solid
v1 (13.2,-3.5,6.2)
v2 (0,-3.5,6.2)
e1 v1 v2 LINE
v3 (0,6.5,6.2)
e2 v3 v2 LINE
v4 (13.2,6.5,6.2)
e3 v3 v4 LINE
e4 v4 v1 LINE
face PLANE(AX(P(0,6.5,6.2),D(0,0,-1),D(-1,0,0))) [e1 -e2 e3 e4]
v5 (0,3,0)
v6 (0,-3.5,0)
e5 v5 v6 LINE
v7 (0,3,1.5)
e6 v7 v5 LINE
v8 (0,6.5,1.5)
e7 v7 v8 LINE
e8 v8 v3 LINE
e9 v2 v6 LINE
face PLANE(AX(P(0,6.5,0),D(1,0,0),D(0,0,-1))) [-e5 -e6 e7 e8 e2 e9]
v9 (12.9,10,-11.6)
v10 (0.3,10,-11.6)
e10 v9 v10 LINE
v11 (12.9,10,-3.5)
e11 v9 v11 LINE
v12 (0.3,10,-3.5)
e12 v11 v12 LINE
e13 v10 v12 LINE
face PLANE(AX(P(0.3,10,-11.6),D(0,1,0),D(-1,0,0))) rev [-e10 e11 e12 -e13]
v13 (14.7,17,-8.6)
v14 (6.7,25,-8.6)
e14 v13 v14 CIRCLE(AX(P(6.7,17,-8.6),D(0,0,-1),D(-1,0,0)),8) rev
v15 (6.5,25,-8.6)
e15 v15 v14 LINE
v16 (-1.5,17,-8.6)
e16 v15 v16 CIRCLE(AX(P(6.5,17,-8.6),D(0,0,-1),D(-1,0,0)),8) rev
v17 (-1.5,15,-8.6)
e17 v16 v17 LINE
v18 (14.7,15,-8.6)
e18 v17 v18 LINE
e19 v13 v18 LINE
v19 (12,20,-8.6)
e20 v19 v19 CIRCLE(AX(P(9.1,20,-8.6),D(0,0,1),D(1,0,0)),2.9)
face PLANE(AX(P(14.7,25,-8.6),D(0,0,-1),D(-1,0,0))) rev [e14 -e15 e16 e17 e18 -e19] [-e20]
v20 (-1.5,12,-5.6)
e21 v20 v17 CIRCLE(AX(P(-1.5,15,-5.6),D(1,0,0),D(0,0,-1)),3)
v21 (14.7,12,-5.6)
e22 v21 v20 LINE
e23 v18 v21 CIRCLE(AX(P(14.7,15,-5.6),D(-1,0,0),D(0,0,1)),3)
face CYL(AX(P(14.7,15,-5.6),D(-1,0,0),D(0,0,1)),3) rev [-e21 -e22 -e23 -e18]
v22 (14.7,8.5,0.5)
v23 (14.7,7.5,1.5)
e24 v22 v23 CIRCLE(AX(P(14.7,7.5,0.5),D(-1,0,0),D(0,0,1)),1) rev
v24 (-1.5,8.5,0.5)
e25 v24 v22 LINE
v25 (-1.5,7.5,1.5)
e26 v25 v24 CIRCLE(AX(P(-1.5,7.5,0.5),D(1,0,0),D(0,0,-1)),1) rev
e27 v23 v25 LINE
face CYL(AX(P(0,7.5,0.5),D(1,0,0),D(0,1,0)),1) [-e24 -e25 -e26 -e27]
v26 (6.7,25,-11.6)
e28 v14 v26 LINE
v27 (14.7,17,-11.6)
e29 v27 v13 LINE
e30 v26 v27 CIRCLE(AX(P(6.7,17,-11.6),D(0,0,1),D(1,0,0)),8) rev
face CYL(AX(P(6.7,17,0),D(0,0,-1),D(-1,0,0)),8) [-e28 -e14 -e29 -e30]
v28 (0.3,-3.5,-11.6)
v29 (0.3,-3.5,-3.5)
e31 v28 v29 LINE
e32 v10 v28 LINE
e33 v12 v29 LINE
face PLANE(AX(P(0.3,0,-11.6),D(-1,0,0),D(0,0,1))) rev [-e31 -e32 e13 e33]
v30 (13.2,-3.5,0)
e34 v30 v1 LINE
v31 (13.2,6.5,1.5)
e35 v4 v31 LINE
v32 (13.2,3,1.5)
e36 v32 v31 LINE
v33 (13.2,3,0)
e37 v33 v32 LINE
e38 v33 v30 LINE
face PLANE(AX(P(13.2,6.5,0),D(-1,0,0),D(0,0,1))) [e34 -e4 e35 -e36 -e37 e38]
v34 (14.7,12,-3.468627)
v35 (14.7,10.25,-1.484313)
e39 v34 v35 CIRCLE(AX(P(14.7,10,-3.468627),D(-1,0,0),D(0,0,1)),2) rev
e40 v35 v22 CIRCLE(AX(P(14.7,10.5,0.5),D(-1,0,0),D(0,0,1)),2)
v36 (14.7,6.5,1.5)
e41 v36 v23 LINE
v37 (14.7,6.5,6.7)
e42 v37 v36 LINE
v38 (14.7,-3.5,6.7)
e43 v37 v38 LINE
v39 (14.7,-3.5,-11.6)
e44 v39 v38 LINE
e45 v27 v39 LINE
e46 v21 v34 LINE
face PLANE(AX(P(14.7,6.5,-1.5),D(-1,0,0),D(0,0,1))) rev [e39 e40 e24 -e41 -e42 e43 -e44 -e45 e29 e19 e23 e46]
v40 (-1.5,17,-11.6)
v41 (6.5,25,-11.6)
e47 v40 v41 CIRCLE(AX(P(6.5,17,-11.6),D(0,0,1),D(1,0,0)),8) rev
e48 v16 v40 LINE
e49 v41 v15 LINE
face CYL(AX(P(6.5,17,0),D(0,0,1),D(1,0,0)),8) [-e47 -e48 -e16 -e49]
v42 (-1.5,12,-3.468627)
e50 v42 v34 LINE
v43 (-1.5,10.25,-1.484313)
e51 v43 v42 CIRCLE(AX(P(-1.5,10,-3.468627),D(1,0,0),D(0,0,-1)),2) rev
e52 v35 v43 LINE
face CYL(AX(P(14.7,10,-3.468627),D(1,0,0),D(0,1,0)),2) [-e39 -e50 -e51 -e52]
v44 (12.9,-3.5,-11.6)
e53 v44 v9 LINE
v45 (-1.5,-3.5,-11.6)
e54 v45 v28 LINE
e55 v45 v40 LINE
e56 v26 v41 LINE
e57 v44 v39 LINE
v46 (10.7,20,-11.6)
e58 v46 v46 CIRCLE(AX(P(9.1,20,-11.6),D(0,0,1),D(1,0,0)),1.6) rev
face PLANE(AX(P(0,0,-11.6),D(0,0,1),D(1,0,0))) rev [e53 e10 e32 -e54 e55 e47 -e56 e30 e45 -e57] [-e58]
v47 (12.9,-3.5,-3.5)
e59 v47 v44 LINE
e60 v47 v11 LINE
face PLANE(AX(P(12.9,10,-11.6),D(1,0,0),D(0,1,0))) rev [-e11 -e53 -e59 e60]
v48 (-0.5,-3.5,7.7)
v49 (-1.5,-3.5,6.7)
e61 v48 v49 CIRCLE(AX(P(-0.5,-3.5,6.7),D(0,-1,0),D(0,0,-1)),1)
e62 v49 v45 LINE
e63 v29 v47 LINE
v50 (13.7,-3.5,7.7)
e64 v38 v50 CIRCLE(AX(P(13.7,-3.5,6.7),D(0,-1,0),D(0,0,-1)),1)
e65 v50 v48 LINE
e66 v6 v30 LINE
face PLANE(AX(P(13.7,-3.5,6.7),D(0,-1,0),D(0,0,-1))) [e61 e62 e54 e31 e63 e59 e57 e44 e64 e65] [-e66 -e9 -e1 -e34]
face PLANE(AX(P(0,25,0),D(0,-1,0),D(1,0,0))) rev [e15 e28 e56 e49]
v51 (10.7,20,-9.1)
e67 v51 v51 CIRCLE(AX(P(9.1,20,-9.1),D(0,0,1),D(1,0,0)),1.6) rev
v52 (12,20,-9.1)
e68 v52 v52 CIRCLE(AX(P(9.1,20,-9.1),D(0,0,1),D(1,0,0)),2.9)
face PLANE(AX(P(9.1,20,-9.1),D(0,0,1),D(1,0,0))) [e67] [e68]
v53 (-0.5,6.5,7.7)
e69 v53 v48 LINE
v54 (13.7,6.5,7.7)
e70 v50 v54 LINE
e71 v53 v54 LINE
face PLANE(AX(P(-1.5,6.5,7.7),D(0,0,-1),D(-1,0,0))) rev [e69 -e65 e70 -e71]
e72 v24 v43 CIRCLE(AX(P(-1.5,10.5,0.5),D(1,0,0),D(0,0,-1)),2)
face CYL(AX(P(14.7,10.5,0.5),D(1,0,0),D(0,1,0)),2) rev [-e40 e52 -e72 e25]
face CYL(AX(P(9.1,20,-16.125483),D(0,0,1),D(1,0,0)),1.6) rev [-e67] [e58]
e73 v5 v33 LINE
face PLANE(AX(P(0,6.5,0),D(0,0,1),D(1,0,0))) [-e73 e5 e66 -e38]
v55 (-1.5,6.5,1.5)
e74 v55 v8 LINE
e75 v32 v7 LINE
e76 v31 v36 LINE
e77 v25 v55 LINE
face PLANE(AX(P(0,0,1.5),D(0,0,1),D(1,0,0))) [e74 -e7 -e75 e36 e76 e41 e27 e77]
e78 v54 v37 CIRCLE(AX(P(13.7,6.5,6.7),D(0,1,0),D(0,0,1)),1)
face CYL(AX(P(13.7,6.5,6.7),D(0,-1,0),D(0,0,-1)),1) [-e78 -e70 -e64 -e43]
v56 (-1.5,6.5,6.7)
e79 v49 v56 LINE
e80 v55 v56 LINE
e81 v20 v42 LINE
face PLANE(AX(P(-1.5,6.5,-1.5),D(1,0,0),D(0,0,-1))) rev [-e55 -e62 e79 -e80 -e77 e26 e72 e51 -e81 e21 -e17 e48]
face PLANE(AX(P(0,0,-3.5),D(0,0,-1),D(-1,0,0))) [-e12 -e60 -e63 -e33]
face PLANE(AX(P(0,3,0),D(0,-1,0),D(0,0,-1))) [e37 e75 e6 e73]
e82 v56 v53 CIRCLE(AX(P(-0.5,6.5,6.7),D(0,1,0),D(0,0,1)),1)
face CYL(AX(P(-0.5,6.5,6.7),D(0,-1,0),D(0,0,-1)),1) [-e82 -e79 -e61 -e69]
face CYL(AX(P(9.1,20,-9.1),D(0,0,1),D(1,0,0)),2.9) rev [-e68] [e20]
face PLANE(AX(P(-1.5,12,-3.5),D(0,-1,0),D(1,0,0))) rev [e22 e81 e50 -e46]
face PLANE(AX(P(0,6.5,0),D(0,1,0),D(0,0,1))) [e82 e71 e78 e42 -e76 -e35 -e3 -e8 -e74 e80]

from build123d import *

# Parameters (mm, degrees)
CROQUIS2_W              = 16.2
CROQUIS2_H              = 9.2
CROQUIS2_W_2            = 13.2
CROQUIS2_H_2            = 6.2
SALIENTE_EXTRUIR1_DEPTH = 6.5
CROQUIS3_W              = 16.2
CROQUIS3_H              = 12
SALIENTE_EXTRUIR2_DEPTH = 2
SALIENTE_EXTRUIR3_DEPTH = 8.1
CROQUIS5_W              = 16.2
CROQUIS5_H              = 3
SALIENTE_EXTRUIR4_DEPTH = 13
CROQUIS6_R              = 1.6
CORTAR_EXTRUIR1_DEPTH   = 3
CROQUIS7_W              = 16.2
CROQUIS7_H              = 2
SALIENTE_EXTRUIR5_DEPTH = 3
CROQUIS8_R              = 2.9
CORTAR_EXTRUIR2_DEPTH   = 0.5
REDONDEO1_R             = 1
REDONDEO2_R             = 1
REDONDEO3_R             = 2
REDONDEO4_R             = 2
REDONDEO5_R             = 3
REDONDEO6_R             = 8
CROQUIS9_W              = 13.2
CROQUIS9_H              = 6.2
SALIENTE_EXTRUIR6_DEPTH = 3.5
CROQUIS10_W             = 13.2
CROQUIS10_H             = 1.5
SALIENTE_EXTRUIR7_DEPTH = 3.5


with BuildPart() as part:
    # Croquis2 → Saliente-Extruir1 (new body)
    with BuildSketch(Plane(origin=(0, 0, 0), x_dir=(1, 0, 0), z_dir=(0, 1, 0))):
        with Locations((6.6, -3.1)):
            Rectangle(CROQUIS2_W, CROQUIS2_H)
        with Locations((6.6, -3.1)):
            Rectangle(CROQUIS2_W_2, CROQUIS2_H_2, mode=Mode.SUBTRACT)
    extrude(amount=SALIENTE_EXTRUIR1_DEPTH)

    # Croquis3 → Saliente-Extruir2 (add)
    with BuildSketch(Plane(origin=(0, 0, -1.5), x_dir=(-1, 0, 0), z_dir=(0, 0, -1))):
        with Locations((-6.6, 6)):
            Rectangle(CROQUIS3_W, CROQUIS3_H)
    extrude(amount=SALIENTE_EXTRUIR2_DEPTH)

    # Croquis4 → Saliente-Extruir3 (add)
    with BuildSketch(Plane(origin=(0, 0, -3.5), x_dir=(-1, 0, 0), z_dir=(0, 0, -1))):
        Polygon((1.5, 0), (1.5, 12), (-14.7, 12), (-14.7, 0), (-12.9, 0), (-12.9, 10), (-0.3, 10), (-0.3, 0), align=None)
    extrude(amount=SALIENTE_EXTRUIR3_DEPTH)

    # Croquis5 → Saliente-Extruir4 (add)
    with BuildSketch(Plane(origin=(0, 12, 0), x_dir=(1, 0, 0), z_dir=(0, 1, 0))):
        with Locations((6.6, 10.1)):
            Rectangle(CROQUIS5_W, CROQUIS5_H)
    extrude(amount=SALIENTE_EXTRUIR4_DEPTH)

    # Croquis6 → Cortar-Extruir1 (cut)
    with BuildSketch(Plane.XY.offset(-8.6)):
        with Locations((9.1, 20)):
            Circle(CROQUIS6_R)
    extrude(amount=-CORTAR_EXTRUIR1_DEPTH, mode=Mode.SUBTRACT)

    # Croquis7 → Saliente-Extruir5 (add)
    with BuildSketch(Plane.XY.offset(-1.5)):
        with Locations((6.6, 7.5)):
            Rectangle(CROQUIS7_W, CROQUIS7_H)
    extrude(amount=SALIENTE_EXTRUIR5_DEPTH)

    # Croquis8 → Cortar-Extruir2 (cut)
    with BuildSketch(Plane.XY.offset(-8.6)):
        with Locations((9.1, 20)):
            Circle(CROQUIS8_R)
    extrude(amount=-CORTAR_EXTRUIR2_DEPTH, mode=Mode.SUBTRACT)

    # Redondeo1
    redondeo1_edges = [part.edges().sort_by_distance(p)[0] for p in [
        (14.7, 3.25, 7.7),
        (-1.5, 3.25, 7.7),
    ]]
    fillet(redondeo1_edges, radius=REDONDEO1_R)

    # Redondeo2
    redondeo2_edges = [part.edges().sort_by_distance(p)[0] for p in [
        (6.6, 8.5, 1.5),
    ]]
    fillet(redondeo2_edges, radius=REDONDEO2_R)

    # Redondeo3
    redondeo3_edges = [part.edges().sort_by_distance(p)[0] for p in [
        (6.6, 8.5, -1.5),
    ]]
    fillet(redondeo3_edges, radius=REDONDEO3_R - 0.0001)  # a hair under: the kernel refuses the full size

    # Redondeo4
    redondeo4_edges = [part.edges().sort_by_distance(p)[0] for p in [
        (6.6, 12, -1.5),
    ]]
    fillet(redondeo4_edges, radius=REDONDEO4_R)

    # Redondeo5
    redondeo5_edges = [part.edges().sort_by_distance(p)[0] for p in [
        (6.6, 12, -8.6),
    ]]
    fillet(redondeo5_edges, radius=REDONDEO5_R)

    # Redondeo6
    redondeo6_edges = [part.edges().sort_by_distance(p)[0] for p in [
        (14.7, 25, -10.1),
        (-1.5, 25, -10.1),
    ]]
    fillet(redondeo6_edges, radius=REDONDEO6_R)

    # Croquis9 → Saliente-Extruir6 (add)
    with BuildSketch(Plane.XZ):
        with BuildLine():
            Line((13.7, 7.7), (-0.5, 7.7))
            ThreePointArc((-0.5, 7.7), (-1.207106781, 7.407106781), (-1.5, 6.7))
            Line((-1.5, 6.7), (-1.5, -11.6))
            Line((-1.5, -11.6), (0.3, -11.6))
            Line((0.3, -11.6), (0.3, -3.5))
            Line((0.3, -3.5), (12.9, -3.5))
            Line((12.9, -3.5), (12.9, -11.6))
            Line((12.9, -11.6), (14.7, -11.6))
            Line((14.7, -11.6), (14.7, 6.7))
            ThreePointArc((14.7, 6.7), (14.407106781, 7.407106781), (13.7, 7.7))
        make_face()
        with Locations((6.6, 3.1)):
            Rectangle(CROQUIS9_W, CROQUIS9_H, mode=Mode.SUBTRACT)
    extrude(amount=SALIENTE_EXTRUIR6_DEPTH)

    # Croquis10 → Saliente-Extruir7 (add)
    with BuildSketch(Plane.XZ.offset(-6.5)):
        with Locations((6.6, 0.75)):
            Rectangle(CROQUIS10_W, CROQUIS10_H)
    extrude(amount=SALIENTE_EXTRUIR7_DEPTH)


solid = part.part
